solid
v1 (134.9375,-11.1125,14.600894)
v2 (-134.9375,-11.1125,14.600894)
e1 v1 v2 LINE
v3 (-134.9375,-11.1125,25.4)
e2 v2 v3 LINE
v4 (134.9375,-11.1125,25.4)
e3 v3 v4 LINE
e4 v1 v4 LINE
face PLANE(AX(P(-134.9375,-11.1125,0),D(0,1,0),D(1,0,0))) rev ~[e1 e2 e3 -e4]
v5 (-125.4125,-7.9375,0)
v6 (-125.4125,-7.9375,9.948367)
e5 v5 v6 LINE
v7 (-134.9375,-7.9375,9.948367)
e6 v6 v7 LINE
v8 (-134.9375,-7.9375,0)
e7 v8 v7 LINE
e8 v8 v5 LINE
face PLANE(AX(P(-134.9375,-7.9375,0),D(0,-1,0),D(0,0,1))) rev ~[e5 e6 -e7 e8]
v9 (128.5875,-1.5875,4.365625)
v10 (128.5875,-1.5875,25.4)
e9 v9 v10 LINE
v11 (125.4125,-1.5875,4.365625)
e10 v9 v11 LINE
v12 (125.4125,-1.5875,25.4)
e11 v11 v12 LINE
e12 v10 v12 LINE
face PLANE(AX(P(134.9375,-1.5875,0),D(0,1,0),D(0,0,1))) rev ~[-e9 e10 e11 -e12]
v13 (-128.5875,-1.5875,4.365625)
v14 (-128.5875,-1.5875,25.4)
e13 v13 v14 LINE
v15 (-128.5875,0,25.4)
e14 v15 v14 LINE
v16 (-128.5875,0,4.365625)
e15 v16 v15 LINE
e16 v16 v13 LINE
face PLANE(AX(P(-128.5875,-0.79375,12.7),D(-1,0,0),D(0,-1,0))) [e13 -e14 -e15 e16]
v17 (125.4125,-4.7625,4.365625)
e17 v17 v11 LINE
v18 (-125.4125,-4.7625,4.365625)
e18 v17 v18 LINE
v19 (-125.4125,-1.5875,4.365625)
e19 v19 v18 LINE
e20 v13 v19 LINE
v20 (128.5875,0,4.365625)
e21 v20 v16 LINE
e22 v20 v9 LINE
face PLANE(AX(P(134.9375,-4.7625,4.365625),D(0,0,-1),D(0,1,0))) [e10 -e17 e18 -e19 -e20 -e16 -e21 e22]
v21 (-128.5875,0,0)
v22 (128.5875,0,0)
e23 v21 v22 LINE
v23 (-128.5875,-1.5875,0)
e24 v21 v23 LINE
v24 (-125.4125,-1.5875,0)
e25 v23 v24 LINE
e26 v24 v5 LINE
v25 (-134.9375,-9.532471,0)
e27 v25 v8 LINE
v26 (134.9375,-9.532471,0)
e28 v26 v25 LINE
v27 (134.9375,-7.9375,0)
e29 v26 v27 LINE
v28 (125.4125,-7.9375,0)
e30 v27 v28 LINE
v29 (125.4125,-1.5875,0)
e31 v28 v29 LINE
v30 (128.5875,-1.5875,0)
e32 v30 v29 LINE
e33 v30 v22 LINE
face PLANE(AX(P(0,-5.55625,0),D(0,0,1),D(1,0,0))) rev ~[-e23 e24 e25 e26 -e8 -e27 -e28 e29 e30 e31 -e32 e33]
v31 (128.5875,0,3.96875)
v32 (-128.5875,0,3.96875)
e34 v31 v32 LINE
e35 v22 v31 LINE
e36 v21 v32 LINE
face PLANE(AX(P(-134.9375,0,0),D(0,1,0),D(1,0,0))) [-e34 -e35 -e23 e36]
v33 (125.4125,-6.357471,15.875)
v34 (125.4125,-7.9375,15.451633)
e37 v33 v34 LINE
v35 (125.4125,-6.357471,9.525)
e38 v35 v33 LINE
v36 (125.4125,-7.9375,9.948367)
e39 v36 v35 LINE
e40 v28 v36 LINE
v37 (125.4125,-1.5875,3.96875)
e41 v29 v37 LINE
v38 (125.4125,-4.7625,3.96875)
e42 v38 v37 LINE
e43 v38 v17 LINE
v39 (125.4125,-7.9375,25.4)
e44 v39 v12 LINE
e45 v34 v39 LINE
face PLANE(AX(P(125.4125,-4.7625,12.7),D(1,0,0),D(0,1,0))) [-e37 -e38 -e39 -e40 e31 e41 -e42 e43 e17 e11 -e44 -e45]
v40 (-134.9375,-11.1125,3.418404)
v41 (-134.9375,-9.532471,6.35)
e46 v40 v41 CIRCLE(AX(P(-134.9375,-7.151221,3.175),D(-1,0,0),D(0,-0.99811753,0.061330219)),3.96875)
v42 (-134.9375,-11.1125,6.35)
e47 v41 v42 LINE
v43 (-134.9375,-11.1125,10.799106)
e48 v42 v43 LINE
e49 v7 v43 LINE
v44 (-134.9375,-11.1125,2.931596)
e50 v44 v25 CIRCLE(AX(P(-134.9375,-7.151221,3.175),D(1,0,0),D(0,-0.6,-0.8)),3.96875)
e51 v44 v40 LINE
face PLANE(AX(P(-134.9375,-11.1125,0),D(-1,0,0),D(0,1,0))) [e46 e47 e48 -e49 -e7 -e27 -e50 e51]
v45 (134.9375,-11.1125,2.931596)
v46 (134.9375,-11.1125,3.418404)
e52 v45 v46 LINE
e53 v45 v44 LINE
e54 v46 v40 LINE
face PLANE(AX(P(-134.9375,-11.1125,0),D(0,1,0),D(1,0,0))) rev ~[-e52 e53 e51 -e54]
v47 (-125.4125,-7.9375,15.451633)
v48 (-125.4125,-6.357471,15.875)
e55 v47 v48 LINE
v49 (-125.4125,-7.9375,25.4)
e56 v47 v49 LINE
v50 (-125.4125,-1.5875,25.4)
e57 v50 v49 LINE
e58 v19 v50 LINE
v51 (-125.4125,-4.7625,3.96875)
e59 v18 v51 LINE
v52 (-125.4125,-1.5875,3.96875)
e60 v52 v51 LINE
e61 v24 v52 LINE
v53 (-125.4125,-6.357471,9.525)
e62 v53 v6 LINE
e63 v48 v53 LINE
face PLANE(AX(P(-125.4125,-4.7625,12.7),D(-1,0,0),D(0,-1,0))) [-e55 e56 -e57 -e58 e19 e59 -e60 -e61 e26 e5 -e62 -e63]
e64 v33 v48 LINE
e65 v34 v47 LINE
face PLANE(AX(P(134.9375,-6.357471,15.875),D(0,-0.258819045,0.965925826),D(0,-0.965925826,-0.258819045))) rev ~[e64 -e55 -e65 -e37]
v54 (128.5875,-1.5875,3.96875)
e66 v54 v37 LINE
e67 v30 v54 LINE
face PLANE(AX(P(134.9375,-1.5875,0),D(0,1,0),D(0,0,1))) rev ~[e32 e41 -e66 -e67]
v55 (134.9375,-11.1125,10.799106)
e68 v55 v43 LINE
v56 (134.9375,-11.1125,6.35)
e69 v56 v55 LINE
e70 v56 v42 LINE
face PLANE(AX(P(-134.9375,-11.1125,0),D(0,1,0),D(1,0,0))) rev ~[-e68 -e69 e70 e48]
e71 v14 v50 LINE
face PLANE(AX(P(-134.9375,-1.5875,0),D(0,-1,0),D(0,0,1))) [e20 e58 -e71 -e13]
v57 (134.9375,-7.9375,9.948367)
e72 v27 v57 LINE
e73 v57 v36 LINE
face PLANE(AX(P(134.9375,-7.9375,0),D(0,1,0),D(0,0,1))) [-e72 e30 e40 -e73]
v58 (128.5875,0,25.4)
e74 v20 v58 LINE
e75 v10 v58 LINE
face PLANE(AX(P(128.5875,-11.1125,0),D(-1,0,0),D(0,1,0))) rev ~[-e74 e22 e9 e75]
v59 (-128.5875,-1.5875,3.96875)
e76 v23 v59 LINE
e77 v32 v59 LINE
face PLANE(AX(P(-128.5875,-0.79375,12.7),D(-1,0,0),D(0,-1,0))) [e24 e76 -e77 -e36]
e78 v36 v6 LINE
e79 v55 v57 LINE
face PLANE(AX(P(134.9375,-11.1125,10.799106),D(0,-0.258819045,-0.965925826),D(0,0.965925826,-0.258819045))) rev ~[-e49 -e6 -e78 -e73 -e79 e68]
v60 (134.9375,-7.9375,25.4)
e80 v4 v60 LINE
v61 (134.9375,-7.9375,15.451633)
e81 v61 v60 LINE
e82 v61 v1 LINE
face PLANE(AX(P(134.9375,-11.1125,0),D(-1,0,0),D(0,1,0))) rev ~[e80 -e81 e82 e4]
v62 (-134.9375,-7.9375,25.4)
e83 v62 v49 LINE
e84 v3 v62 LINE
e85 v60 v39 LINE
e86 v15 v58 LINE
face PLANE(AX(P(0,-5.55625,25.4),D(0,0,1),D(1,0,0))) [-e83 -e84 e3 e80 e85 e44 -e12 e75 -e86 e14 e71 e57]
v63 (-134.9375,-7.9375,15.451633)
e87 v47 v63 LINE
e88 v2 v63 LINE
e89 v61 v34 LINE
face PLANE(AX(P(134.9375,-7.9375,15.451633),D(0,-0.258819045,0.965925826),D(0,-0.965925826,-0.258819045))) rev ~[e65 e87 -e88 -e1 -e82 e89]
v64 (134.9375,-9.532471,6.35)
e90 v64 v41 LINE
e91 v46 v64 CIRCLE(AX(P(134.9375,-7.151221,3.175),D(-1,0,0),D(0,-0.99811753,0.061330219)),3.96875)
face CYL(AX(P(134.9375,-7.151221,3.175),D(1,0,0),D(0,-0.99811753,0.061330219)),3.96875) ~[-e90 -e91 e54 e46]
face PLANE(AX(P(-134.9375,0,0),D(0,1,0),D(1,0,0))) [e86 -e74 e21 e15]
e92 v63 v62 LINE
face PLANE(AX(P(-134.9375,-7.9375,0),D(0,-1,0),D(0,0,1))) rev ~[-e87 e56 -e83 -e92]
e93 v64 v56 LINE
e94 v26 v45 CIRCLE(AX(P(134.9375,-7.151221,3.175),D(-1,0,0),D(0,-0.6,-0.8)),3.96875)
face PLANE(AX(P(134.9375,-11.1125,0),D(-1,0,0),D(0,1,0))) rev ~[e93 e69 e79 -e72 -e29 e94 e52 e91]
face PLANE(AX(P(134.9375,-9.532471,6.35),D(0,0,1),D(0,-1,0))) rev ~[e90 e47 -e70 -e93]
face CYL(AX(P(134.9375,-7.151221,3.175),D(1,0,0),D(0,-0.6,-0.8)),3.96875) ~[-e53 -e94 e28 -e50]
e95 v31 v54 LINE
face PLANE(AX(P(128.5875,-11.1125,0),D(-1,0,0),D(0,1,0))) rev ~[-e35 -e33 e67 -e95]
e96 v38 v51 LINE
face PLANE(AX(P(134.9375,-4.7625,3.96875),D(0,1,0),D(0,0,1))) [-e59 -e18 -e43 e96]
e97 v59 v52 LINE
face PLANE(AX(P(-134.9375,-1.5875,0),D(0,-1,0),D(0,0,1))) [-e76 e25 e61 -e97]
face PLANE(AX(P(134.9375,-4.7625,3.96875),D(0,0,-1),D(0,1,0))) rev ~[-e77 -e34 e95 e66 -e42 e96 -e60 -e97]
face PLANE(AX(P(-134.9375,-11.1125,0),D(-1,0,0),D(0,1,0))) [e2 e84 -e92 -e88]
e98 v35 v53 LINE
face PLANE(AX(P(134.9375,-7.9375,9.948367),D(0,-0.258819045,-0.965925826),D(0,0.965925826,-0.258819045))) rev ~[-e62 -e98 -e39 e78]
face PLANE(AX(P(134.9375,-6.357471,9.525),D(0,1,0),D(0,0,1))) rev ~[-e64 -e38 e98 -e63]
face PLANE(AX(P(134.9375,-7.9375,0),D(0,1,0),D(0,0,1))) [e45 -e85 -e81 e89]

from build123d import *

# Parameters (mm, degrees)
F0_W      = 269.875
F0_H      = 11.1125
F1_DEPTH  = 25.4
F2_W      = 6.35
F2_H      = 25.4
F3_DEPTH  = 9.525
F4_DEPTH  = 6.35
F5_W      = 1.5875
F5_H      = 25.4
F6_DEPTH  = 6.35
F5_W_2    = 6.35
F7_DEPTH  = 9.525
F8_W      = 4.7625
F8_H      = 0.396875
F9_DEPTH  = 269.876
F11_DEPTH = 269.876
F12_DEPTH = 269.875
F13_DEPTH = 269.876


with BuildPart() as f1:
    # F0 (on Top) → F1 (new body)
    with BuildSketch(Plane.XY):
        with Locations((0, -5.55625)):
            Rectangle(F0_W, F0_H)
    extrude(amount=F1_DEPTH)

    # F2 (on face) → F3 (cut)
    with BuildSketch(Plane.YZ.offset(134.9375)):
        with Locations((-4.7625, 12.7)):
            Rectangle(F2_W, F2_H)
    extrude(amount=-F3_DEPTH, mode=Mode.SUBTRACT)

    # F4 (cut): a face of the model
    f4_faces = [f1.faces().sort_by_distance(p)[0] for p in [
        (134.9375, -0.79375, 12.7),
    ]]
    extrude(f4_faces, amount=-F4_DEPTH, mode=Mode.SUBTRACT)

    # F5 (on face) → F6 (cut)
    with BuildSketch(Plane(origin=(-134.9375, 0, 0), x_dir=(0, -1, 0), z_dir=(-1, 0, 0))):
        with Locations((0.79375, 12.7)):
            Rectangle(F5_W, F5_H)
    extrude(amount=-F6_DEPTH, mode=Mode.SUBTRACT)

    # F5 (on face) → F7 (cut)
    with BuildSketch(Plane(origin=(-134.9375, 0, 0), x_dir=(0, -1, 0), z_dir=(-1, 0, 0))):
        with Locations((4.7625, 12.7)):
            Rectangle(F5_W_2, F5_H)
    extrude(amount=-F7_DEPTH, mode=Mode.SUBTRACT)

    # F8 (on face) → F9 (cut, through all)
    with BuildSketch(Plane.YZ.offset(134.9375)):
        with Locations((-2.38125, 4.1671875)):
            Rectangle(F8_W, F8_H)
    extrude(amount=-F9_DEPTH, mode=Mode.SUBTRACT)

    # F10 (on face) → F11 (cut, through all)
    with BuildSketch(Plane.YZ.offset(134.9375)):
        with BuildLine():
            ThreePointArc((-9.5324710518, 0), (-10.6448555046, 1.2920515481), (-11.1125, 2.931595692))
            Line((-11.1125, 2.931595692), (-11.1125, 0))
            Line((-11.1125, 0), (-9.5324710518, 0))
        make_face()
        with BuildLine():
            Line((-11.1125, 3.418404308), (-11.1125, 6.35))
            Line((-11.1125, 6.35), (-11.1199710518, 6.35))
            Line((-11.1199710518, 6.35), (-11.1199710518, 3.175))
            ThreePointArc((-11.1199710518, 3.175), (-11.1181028492, 3.2967594696), (-11.1125, 3.418404308))
        make_face()
    extrude(amount=-F11_DEPTH, mode=Mode.SUBTRACT)

    # F10 (on face) → F12 (cut, through all)
    with BuildSketch(Plane.YZ.offset(134.9375)):
        with BuildLine():
            ThreePointArc((-11.1125, 3.418404308), (-10.6448555046, 5.0579484519), (-9.5324710518, 6.35))
            Line((-9.5324710518, 6.35), (-11.1125, 6.35))
            Line((-11.1125, 6.35), (-11.1125, 3.418404308))
        make_face()
    extrude(amount=-F12_DEPTH, mode=Mode.SUBTRACT)

    # F10 (on face) → F13 (cut, through all)
    with BuildSketch(Plane.YZ.offset(134.9375)):
        Polygon((-11.1125, 12.7), (-11.1125, 10.7991061667), (-7.9375, 9.9483674807), (-7.9375, 12.7), align=None)
        Polygon((-7.9375, 12.7), (-7.9375, 9.9483674807), (-6.3574710518, 9.525), (-6.3574710518, 12.7), align=None)
        Polygon((-11.1125, 14.6008938333), (-11.1125, 12.7), (-7.9375, 12.7), (-7.9375, 15.4516325193), align=None)
        Polygon((-7.9375, 15.4516325193), (-7.9375, 12.7), (-6.3574710518, 12.7), (-6.3574710518, 15.875), align=None)
    extrude(amount=-F13_DEPTH, mode=Mode.SUBTRACT)


solid = f1.part
